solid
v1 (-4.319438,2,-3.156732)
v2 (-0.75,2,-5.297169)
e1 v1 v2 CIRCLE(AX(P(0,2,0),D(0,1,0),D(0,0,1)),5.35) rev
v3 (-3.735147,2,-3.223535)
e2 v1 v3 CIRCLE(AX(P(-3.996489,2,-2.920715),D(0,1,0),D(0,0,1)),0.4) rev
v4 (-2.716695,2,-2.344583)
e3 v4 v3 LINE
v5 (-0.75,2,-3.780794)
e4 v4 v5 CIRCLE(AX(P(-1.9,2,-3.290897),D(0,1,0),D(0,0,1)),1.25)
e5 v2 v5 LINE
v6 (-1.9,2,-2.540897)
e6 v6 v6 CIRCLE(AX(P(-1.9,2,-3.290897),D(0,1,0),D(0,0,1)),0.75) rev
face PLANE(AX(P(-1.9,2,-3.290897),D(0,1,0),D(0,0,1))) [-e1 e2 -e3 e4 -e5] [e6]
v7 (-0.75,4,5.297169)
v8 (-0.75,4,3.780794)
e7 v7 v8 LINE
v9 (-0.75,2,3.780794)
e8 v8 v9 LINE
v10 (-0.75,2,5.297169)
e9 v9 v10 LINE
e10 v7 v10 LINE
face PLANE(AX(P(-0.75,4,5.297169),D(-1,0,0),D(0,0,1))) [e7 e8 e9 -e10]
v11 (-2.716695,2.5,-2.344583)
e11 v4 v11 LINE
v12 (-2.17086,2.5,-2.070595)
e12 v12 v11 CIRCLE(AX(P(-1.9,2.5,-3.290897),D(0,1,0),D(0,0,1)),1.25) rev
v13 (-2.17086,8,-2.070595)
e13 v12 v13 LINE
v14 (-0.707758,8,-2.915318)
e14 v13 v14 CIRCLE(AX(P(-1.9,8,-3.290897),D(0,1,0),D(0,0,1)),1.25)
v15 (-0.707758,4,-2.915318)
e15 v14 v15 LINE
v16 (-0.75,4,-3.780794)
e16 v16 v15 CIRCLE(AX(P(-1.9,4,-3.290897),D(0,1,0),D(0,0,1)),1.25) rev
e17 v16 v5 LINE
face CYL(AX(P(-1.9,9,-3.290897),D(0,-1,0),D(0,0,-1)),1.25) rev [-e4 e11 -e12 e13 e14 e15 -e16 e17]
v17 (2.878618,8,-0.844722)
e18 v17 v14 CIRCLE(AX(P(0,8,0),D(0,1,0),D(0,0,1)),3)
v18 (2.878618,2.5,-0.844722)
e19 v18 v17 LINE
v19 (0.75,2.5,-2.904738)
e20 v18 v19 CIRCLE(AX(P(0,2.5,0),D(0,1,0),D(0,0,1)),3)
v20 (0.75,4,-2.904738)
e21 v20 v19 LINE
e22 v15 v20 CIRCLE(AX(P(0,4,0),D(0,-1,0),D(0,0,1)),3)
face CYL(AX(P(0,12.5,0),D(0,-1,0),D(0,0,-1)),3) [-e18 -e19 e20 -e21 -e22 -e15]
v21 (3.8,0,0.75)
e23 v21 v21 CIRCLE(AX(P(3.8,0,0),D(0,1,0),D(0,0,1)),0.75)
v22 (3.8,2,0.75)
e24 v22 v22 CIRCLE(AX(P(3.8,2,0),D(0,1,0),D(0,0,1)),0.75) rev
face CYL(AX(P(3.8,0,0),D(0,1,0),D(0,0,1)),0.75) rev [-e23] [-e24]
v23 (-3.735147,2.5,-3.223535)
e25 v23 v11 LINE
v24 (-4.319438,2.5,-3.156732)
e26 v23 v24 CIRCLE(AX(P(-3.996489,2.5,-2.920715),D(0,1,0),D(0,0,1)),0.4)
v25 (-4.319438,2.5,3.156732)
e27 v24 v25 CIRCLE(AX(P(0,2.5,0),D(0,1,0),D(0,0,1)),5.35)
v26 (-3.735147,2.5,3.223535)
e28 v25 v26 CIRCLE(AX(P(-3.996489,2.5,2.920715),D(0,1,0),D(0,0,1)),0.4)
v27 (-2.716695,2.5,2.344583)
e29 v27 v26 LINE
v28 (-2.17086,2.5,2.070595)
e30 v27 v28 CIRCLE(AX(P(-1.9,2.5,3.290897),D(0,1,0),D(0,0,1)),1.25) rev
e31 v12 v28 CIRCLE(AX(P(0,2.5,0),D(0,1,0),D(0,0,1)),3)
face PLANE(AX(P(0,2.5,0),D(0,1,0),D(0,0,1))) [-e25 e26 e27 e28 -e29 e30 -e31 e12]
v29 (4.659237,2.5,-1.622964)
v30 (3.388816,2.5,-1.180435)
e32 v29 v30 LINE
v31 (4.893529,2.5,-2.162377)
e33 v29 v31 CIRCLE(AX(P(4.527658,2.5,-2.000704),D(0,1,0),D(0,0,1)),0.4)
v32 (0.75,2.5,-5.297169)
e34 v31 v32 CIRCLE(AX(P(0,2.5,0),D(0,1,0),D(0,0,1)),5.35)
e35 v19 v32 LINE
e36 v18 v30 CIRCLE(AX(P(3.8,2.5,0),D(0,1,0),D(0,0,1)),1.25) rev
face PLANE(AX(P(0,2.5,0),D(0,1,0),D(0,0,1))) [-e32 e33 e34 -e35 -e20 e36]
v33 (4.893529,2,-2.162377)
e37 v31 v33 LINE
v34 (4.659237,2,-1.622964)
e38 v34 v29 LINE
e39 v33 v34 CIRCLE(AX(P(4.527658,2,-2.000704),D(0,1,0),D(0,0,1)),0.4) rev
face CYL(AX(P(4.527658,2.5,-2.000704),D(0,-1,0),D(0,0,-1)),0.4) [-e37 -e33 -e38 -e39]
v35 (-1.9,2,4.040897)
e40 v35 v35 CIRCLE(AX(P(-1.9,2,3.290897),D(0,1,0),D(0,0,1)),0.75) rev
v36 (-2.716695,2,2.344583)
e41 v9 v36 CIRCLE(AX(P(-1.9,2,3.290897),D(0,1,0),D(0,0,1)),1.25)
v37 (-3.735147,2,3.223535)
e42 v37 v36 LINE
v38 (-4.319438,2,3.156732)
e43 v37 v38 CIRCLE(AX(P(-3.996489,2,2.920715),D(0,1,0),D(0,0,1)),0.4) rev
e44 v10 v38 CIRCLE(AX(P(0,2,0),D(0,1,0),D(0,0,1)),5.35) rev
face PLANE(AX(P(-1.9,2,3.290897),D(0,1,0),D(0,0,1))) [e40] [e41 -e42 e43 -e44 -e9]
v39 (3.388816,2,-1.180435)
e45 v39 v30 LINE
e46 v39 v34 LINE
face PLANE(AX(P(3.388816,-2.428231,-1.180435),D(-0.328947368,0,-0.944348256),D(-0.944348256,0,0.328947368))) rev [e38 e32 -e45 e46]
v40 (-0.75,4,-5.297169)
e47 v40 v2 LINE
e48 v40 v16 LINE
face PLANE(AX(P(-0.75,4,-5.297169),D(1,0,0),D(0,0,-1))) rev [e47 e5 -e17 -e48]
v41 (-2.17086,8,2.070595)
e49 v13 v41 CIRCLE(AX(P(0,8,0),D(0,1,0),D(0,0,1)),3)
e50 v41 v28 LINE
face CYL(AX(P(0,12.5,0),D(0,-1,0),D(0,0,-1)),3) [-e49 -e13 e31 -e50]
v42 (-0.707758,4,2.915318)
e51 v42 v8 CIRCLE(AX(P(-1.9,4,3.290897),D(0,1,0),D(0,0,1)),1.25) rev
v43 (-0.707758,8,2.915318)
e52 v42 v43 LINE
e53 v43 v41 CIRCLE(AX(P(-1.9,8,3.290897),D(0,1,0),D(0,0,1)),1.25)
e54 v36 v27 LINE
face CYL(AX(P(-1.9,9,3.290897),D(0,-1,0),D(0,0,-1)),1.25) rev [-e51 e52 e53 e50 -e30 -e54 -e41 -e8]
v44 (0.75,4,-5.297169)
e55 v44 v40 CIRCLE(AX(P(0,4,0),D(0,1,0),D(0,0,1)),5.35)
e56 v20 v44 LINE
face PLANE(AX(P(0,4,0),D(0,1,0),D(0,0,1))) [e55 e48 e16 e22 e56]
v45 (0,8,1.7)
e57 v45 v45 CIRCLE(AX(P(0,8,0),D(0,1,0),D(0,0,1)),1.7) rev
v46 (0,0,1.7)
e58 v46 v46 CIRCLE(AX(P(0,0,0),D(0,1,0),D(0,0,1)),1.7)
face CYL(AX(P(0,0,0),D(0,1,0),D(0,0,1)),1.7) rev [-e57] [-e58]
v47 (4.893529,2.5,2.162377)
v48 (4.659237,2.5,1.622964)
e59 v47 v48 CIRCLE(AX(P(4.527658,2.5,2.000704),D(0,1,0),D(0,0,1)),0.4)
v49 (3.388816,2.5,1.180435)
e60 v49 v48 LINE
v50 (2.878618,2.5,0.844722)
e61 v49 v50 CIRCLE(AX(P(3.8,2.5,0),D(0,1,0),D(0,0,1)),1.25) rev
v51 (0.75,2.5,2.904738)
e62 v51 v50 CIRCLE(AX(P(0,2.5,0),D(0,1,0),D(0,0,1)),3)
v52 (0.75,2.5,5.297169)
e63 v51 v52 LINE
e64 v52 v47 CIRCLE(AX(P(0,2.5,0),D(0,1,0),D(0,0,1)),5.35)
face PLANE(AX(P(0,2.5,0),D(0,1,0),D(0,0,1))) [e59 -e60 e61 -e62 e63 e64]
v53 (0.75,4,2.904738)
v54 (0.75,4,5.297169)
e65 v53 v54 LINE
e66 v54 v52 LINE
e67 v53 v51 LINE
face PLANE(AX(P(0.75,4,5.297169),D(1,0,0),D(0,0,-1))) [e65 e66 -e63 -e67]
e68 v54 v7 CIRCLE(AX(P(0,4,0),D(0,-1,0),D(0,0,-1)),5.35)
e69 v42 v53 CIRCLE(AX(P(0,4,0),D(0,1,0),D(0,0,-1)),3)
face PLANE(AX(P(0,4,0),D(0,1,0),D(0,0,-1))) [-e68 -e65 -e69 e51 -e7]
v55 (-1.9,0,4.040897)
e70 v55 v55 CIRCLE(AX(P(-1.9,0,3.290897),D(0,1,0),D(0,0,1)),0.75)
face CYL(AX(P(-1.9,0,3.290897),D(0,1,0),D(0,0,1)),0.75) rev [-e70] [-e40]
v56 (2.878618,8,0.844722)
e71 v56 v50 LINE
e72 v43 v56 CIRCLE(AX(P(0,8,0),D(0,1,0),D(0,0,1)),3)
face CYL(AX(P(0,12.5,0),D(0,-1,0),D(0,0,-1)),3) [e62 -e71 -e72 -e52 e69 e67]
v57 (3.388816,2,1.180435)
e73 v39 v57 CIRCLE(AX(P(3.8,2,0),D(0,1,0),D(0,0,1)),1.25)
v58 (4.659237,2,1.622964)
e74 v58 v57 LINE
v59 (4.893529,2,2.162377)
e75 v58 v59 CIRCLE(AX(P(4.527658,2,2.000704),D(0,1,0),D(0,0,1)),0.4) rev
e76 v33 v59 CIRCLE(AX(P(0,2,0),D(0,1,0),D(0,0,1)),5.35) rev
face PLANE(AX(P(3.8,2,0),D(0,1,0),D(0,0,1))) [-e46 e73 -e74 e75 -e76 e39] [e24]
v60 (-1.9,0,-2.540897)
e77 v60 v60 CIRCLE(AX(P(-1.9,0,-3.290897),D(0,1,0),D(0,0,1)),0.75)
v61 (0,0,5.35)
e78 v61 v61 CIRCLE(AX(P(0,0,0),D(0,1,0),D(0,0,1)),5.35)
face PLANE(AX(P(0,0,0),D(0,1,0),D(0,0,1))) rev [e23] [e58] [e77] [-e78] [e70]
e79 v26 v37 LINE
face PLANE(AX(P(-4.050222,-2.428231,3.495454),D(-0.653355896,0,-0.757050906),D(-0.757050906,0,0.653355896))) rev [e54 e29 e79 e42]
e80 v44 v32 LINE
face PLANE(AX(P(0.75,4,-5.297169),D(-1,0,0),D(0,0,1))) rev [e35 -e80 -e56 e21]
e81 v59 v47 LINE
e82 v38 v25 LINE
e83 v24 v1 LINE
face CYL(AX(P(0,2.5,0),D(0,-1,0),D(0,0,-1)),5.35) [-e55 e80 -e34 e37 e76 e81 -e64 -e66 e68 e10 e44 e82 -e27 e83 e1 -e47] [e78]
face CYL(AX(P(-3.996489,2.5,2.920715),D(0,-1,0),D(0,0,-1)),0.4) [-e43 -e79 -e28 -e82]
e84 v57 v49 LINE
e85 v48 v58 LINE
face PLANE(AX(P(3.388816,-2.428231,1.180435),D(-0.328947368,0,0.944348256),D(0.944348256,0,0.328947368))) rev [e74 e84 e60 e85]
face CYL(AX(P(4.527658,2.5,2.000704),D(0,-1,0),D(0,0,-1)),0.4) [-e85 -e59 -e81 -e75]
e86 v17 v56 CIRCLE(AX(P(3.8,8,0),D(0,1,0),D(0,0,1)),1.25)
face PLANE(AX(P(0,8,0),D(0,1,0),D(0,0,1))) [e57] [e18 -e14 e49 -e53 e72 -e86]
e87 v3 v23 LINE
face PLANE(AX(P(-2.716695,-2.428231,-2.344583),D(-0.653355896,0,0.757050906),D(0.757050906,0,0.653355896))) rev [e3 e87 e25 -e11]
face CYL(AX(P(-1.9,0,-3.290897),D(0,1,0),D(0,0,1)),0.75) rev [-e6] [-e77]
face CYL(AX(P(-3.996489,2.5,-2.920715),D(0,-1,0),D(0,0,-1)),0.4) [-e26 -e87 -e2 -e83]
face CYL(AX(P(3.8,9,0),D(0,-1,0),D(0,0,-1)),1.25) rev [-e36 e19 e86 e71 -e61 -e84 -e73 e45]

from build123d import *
from build123d.topology import SkipClean

# Parameters (mm, degrees)
SKETCH1_R           = 5.35
BOSS_EXTRUDE1_DEPTH = 2.5
HOLE1_OUTLINE_R     = 1.7
HOLE1_DEPTH         = 2.5
SKETCH3_R           = 3
SKETCH3_R_2         = 1.7
BOSS_EXTRUDE2_DEPTH = 10
FILLET1_R           = 0.1
BOSS_EXTRUDE3_DEPTH = 1.5
SKETCH8_R           = 0.75
CUT_EXTRUDE1_DEPTH  = 13.539736839
CUT_EXTRUDE3_START  = -0.5
SKETCH13_R          = 1.25
CUT_EXTRUDE3_DEPTH  = 7
CHAMFER1_SIZE       = 0.25
CUT_EXTRUDE4_START  = -0.5
CUT_EXTRUDE4_DEPTH  = 0.5
FILLET2_R           = 0.4
CUT_EXTRUDE5_START  = -4.5
SKETCH15_R          = 3
CUT_EXTRUDE5_DEPTH  = 4.5


# Read off the part's stored shape, not the designer's step: Hole1
with BuildPart() as part:
    # Sketch1 → Boss-Extrude1 (new body)
    with BuildSketch(Plane(origin=(0, 0, 0), x_dir=(1, 0, 0), z_dir=(0, 1, 0))):
        with Locations(Location((0, 0, 0), (0, 0, 270))):
            Circle(SKETCH1_R)
    extrude(amount=BOSS_EXTRUDE1_DEPTH)

    # Hole1 outline → Hole1 (cut)
    with BuildSketch(Plane(origin=(0, 0, 0), x_dir=(1, 0, 0), z_dir=(0, 1, 0))):
        Circle(HOLE1_OUTLINE_R)
    extrude(amount=HOLE1_DEPTH, mode=Mode.SUBTRACT)

    # Sketch3 → Boss-Extrude2 (add)
    with BuildSketch(Plane(origin=(0, 2.5, 0), x_dir=(1, 0, 0), z_dir=(0, 1, 0))):
        with Locations(Location((0, 0, 0), (0, 0, 270))):
            Circle(SKETCH3_R)
        with Locations(Location((0, 0, 0), (0, 0, 270))):
            Circle(SKETCH3_R_2, mode=Mode.SUBTRACT)
    extrude(amount=BOSS_EXTRUDE2_DEPTH)

    # Fillet1
    fillet1_edges = [part.edges().sort_by_distance(p)[0] for p in [
        (0, 12.5, -3),
    ]]
    fillet(fillet1_edges, radius=FILLET1_R)

    # Sketch5 → Boss-Extrude3 (add)
    with BuildSketch(Plane(origin=(0, 2.5, 0), x_dir=(1, 0, 0), z_dir=(0, 1, 0))):
        with BuildLine():
            Line((-0.75, 5.297169055), (-0.75, 2.90473751))
            ThreePointArc((-0.75, 2.90473751), (0, 3), (0.75, 2.90473751))
            Line((0.75, 2.90473751), (0.75, 5.297169055))
            ThreePointArc((0.75, 5.297169055), (0, 5.35), (-0.75, 5.297169055))
        make_face()
    boss_extrude3 = extrude(amount=BOSS_EXTRUDE3_DEPTH)

    # Mirror1: Boss-Extrude3 across plane
    with SkipClean():  # the faces are left unmerged after this step: merging them gives an invalid solid
        add(boss_extrude3.mirror(Plane.XY))

    # Sketch8 → Cut-Extrude1 (cut, through all)
    with SkipClean():  # the faces are left unmerged after this step: merging them gives an invalid solid
        with BuildSketch(Plane(origin=(0, 2.5, 0), x_dir=(1, 0, 0), z_dir=(0, 1, 0))):
            with Locations(Location((3.8, 0, 0), (0, 0, 270))):
                Circle(SKETCH8_R)
            with Locations(Location((-1.9, -3.290896534, 0), (0, 0, 270))):
                Circle(SKETCH8_R)
            with Locations(Location((-1.9, 3.290896534, 0), (0, 0, 270))):
                Circle(SKETCH8_R)
        extrude(amount=-CUT_EXTRUDE1_DEPTH, mode=Mode.SUBTRACT)

    # Sketch13 → Cut-Extrude3 (cut)
    with SkipClean():  # the faces are left unmerged after this step: merging them gives an invalid solid
        with BuildSketch(Plane(origin=(0, 2.5, 0), x_dir=(1, 0, 0), z_dir=(0, 1, 0)).offset(CUT_EXTRUDE3_START)):
            with Locations(Location((-1.9, 3.290896534, 0), (0, 0, 23.073918066))):
                Circle(SKETCH13_R)
            with Locations(Location((-1.9, -3.290896534, 0), (0, 0, 102.514591278))):
                Circle(SKETCH13_R)
            with Locations(Location((3.8, 0, 0), (0, 0, 137.485408722))):
                Circle(SKETCH13_R)
        extrude(amount=CUT_EXTRUDE3_DEPTH, mode=Mode.SUBTRACT)

    # Chamfer1
    chamfer1_edges = [part.edges().sort_by_distance(p)[0] for p in [
        (-1.275, 9, -2.20836478),
        (-1.275, 9, 2.20836478),
        (2.55, 9, 0),
    ]]
    chamfer(chamfer1_edges, length=CHAMFER1_SIZE)

    # Sketch14 → Cut-Extrude4 (cut)
    with BuildSketch(Plane(origin=(0, 2.5, 0), x_dir=(1, 0, 0), z_dir=(0, 1, 0)).offset(CUT_EXTRUDE4_START)):
        with BuildLine():
            Line((-0.75, -3.780794483), (-0.75, -5.297169055))
            ThreePointArc((-0.75, -5.297169055), (-2.563606422, -4.695787699), (-4.050222345, -3.495454041))
            Line((-4.050222345, -3.495454041), (-2.716694869, -2.344582902))
            ThreePointArc((-2.716694869, -2.344582902), (-2.637189937, -4.300377092), (-0.75, -3.780794483))
        make_face()
        with BuildLine():
            Line((-0.75, 5.297169055), (-0.75, 3.780794483))
            ThreePointArc((-0.75, 3.780794483), (-2.637189937, 4.300377092), (-2.716694869, 2.344582902))
            Line((-2.716694869, 2.344582902), (-4.050222345, 3.495454041))
            ThreePointArc((-4.050222345, 3.495454041), (-2.563606422, 4.695787699), (-0.75, 5.297169055))
        make_face()
        with BuildLine():
            Line((3.388815789, -1.18043532), (5.05226317, -1.759868421))
            ThreePointArc((5.05226317, -1.759868421), (5.35, 0), (5.05226317, 1.759868421))
            Line((5.05226317, 1.759868421), (3.388815789, 1.18043532))
            ThreePointArc((3.388815789, 1.18043532), (5.05, 0), (3.388815789, -1.18043532))
        make_face()
    extrude(amount=CUT_EXTRUDE4_DEPTH, mode=Mode.SUBTRACT)

    # Fillet2
    fillet2_edges = [part.edges().sort_by_distance(p)[0] for p in [
        (-4.050222345, 2.25, -3.495454041),
        (-4.050222345, 2.25, 3.495454041),
        (5.05226317, 2.25, -1.759868421),
        (5.05226317, 2.25, 1.759868421),
    ]]
    fillet(fillet2_edges, radius=FILLET2_R)

    # Sketch15 → Cut-Extrude5 (cut)
    with BuildSketch(Plane(origin=(0, 12.5, 0), x_dir=(1, 0, 0), z_dir=(0, 1, 0)).offset(CUT_EXTRUDE5_START)):
        Circle(SKETCH15_R)
    extrude(amount=CUT_EXTRUDE5_DEPTH, mode=Mode.SUBTRACT)


solid = part.part
